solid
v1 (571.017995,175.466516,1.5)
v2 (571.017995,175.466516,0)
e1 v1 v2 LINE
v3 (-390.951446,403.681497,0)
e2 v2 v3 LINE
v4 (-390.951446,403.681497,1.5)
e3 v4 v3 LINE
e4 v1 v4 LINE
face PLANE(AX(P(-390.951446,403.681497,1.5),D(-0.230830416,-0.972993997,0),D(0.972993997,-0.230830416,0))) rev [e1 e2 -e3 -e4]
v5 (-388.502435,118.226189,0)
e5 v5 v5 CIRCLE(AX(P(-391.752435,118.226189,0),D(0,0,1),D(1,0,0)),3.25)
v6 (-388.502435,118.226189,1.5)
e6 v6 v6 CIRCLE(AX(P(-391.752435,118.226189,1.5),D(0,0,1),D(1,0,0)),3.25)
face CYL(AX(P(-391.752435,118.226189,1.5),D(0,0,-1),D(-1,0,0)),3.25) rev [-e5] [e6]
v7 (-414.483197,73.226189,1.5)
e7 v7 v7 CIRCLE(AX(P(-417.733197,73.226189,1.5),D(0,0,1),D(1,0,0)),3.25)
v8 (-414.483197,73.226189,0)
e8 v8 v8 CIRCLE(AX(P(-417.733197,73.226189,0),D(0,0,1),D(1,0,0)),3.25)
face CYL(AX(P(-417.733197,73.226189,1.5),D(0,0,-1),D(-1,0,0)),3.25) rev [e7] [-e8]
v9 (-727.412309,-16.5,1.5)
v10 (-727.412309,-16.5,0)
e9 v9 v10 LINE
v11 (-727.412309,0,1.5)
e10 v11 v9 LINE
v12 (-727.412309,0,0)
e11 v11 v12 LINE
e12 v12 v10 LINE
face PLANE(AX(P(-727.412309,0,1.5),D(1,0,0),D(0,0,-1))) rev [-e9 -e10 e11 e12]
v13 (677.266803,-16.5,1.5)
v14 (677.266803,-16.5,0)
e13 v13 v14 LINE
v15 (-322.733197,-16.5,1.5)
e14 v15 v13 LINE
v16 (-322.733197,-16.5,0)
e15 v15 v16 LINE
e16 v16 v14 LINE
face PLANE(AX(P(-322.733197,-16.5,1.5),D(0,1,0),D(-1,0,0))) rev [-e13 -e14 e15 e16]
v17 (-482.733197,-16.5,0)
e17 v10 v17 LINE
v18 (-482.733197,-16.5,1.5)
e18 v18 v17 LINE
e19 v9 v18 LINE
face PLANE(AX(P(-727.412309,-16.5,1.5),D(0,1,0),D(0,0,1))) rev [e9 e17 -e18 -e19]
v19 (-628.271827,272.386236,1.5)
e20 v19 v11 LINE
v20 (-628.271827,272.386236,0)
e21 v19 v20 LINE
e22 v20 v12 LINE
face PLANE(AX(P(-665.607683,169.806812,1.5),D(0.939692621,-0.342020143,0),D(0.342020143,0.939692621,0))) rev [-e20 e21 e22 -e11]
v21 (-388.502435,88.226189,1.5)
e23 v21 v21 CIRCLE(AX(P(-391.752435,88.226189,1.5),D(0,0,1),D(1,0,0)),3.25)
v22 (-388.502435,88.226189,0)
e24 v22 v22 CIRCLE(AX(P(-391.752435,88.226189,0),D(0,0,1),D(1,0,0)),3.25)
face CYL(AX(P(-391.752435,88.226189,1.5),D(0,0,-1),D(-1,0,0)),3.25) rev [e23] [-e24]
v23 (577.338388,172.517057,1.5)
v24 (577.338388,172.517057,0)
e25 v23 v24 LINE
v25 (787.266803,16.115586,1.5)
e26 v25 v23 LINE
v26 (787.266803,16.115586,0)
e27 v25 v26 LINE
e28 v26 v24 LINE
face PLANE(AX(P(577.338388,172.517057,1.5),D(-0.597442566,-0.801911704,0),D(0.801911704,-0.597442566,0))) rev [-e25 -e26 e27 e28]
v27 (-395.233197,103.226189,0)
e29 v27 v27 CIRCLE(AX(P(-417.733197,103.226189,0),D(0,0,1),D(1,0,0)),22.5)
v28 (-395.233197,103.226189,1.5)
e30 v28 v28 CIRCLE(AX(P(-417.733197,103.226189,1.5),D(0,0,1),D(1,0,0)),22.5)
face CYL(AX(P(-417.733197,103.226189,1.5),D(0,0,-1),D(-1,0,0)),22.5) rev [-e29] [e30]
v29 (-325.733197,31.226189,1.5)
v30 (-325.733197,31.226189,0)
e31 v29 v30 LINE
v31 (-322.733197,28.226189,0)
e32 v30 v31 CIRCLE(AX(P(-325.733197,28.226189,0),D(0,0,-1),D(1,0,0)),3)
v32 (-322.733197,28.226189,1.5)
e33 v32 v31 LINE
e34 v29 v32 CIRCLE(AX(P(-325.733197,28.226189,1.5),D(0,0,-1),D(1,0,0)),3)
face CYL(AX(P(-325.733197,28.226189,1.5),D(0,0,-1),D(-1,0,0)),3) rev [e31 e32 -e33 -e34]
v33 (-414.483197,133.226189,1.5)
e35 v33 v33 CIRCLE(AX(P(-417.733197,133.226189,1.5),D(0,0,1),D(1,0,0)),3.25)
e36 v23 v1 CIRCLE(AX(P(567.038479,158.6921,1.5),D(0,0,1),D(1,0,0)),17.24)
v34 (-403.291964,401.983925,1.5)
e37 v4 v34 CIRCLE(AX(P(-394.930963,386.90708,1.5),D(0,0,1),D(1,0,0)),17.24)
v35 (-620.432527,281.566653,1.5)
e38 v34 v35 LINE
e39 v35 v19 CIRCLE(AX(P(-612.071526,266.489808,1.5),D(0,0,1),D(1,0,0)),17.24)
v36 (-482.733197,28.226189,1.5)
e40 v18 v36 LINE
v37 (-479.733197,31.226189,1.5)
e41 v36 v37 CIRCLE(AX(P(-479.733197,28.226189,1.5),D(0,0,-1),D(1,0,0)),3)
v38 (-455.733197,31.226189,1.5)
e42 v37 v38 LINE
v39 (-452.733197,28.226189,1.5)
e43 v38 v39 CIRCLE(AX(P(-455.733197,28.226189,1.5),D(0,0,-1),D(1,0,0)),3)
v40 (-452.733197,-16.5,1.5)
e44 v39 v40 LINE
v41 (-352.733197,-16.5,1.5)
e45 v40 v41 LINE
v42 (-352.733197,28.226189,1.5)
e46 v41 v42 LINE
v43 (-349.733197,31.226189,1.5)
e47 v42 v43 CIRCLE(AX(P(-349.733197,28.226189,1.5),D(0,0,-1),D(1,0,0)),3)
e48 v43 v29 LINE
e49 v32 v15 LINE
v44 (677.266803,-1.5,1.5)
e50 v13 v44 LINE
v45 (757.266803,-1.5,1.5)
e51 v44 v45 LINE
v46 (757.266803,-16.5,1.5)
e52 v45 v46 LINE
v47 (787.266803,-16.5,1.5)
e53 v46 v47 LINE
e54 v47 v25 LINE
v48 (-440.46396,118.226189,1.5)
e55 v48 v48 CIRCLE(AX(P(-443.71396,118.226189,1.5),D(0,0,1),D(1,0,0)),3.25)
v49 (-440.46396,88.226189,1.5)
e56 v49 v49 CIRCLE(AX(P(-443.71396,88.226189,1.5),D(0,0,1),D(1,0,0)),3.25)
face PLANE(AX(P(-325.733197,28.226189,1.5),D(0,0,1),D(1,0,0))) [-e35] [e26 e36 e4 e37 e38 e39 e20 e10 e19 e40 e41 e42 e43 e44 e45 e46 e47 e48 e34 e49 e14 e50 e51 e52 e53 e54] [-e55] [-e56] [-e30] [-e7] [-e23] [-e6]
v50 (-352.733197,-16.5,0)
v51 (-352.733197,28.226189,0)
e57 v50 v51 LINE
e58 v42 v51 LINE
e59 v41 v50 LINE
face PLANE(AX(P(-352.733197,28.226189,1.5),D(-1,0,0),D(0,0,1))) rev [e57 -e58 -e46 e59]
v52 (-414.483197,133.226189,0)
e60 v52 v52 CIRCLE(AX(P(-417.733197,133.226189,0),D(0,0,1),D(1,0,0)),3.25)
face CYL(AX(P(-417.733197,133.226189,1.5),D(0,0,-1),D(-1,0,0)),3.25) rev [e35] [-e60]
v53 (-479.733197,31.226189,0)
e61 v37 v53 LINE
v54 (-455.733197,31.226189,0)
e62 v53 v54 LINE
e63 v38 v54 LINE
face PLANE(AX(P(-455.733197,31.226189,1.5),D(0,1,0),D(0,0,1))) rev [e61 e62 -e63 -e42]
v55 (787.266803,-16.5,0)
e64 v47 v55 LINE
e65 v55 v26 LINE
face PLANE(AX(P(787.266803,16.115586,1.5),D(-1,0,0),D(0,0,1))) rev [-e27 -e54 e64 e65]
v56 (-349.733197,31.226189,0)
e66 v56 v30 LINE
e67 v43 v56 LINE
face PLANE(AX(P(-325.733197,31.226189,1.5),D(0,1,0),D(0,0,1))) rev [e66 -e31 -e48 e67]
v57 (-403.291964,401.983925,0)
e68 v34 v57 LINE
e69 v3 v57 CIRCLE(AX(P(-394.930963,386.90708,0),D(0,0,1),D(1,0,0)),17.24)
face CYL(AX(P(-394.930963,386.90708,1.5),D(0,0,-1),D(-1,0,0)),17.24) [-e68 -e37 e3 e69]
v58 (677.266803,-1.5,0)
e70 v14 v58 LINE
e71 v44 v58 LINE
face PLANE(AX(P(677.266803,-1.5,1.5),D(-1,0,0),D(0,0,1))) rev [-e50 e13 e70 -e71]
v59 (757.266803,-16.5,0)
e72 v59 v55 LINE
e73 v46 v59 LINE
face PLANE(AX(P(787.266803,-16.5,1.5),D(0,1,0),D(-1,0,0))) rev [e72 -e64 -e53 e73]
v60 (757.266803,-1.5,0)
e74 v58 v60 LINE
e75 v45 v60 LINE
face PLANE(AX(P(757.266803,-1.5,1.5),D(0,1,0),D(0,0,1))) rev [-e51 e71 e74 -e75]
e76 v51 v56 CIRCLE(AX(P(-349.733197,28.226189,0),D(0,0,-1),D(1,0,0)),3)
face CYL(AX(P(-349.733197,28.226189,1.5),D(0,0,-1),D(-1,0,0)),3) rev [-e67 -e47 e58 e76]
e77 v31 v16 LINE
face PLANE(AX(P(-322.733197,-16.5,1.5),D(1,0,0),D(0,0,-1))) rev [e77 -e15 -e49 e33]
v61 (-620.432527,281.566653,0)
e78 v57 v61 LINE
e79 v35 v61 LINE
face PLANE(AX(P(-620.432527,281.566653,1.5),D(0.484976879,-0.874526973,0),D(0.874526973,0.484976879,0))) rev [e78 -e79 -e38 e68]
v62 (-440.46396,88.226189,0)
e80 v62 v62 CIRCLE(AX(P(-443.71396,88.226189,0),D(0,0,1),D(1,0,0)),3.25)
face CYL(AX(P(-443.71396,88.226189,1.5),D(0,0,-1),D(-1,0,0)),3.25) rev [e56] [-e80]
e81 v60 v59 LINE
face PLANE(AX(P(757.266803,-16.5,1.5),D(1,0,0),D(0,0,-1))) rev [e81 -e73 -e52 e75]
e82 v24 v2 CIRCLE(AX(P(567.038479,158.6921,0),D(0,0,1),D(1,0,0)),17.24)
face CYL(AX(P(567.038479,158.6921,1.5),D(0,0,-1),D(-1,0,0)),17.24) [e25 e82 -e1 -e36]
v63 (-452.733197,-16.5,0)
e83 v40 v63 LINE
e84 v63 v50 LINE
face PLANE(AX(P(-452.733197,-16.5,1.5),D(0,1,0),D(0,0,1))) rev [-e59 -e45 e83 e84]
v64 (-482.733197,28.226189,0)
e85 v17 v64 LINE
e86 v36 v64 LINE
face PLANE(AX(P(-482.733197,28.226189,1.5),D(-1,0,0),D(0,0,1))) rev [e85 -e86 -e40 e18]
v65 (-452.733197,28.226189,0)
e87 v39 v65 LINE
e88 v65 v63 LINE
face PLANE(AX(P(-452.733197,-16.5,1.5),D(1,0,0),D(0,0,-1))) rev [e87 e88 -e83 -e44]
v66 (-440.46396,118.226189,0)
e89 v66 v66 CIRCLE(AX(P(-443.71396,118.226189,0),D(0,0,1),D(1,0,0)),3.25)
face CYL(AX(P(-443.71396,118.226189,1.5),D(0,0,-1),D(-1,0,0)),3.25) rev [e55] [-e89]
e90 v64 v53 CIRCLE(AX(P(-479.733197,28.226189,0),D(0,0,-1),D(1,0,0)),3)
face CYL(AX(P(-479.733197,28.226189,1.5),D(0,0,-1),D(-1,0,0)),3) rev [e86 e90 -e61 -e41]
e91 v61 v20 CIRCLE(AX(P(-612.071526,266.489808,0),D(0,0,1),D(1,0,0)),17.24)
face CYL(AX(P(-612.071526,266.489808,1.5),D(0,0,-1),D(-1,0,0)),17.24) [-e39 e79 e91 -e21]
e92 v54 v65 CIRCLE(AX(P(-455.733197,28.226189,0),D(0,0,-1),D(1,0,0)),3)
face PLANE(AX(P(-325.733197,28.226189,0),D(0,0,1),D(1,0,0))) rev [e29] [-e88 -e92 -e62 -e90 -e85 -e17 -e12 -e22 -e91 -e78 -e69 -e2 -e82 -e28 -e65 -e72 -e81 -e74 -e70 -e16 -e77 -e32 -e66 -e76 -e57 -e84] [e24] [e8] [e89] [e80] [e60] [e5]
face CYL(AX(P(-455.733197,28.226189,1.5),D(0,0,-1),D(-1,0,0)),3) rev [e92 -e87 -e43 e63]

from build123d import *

# Parameters (mm, degrees)
SKETCH_1_R             = 3.25
SKETCH_1_R_2           = 22.5
SM_BASE_FLANGE_1_DEPTH = 1.5


# Sheet-metal steps are written as plain solids
with BuildPart() as part:
    # Sketch 1 → Базовая кромка1 (new body)
    with BuildSketch(Plane.XY):
        with BuildLine():
            Line((677.266802552, -1.5), (677.266802552, -16.5))
            Line((677.266802552, -16.5), (-322.733197448, -16.5))
            Line((-322.733197448, -16.5), (-322.733197448, 4.22618932))
            Line((-322.733197448, 4.22618932), (-322.733197448, 28.22618932))
            ThreePointArc((-322.733197448, 28.22618932), (-323.611877105, 30.347509663), (-325.733197448, 31.22618932))
            Line((-325.733197448, 31.22618932), (-349.733197448, 31.22618932))
            ThreePointArc((-349.733197448, 31.22618932), (-351.854517792, 30.347509663), (-352.733197448, 28.22618932))
            Line((-352.733197448, 28.22618932), (-352.733197448, 4.22618932))
            Line((-352.733197448, 4.22618932), (-352.733197448, -16.5))
            Line((-352.733197448, -16.5), (-452.733197448, -16.5))
            Line((-452.733197448, -16.5), (-452.733197448, 4.22618932))
            Line((-452.733197448, 4.22618932), (-452.733197448, 28.22618932))
            ThreePointArc((-452.733197448, 28.22618932), (-453.611877105, 30.347509663), (-455.733197448, 31.22618932))
            Line((-455.733197448, 31.22618932), (-479.733197448, 31.22618932))
            ThreePointArc((-479.733197448, 31.22618932), (-481.854517792, 30.347509663), (-482.733197448, 28.22618932))
            Line((-482.733197448, 28.22618932), (-482.733197448, 4.22618932))
            Line((-482.733197448, 4.22618932), (-482.733197448, -16.5))
            Line((-482.733197448, -16.5), (-727.412308586, -16.5))
            Line((-727.412308586, -16.5), (-727.412308586, 0))
            Line((-727.412308586, 0), (-665.607683437, 169.806812014))
            Line((-665.607683437, 169.806812014), (-628.27182662, 272.386235556))
            ThreePointArc((-628.27182662, 272.386235556), (-625.181995264, 277.685039029), (-620.432527225, 281.566653306))
            Line((-620.432527225, 281.566653306), (-403.291964068, 401.983925448))
            ThreePointArc((-403.291964068, 401.983925448), (-397.280386008, 403.986243464), (-390.951446304, 403.681496942))
            Line((-390.951446304, 403.681496942), (571.017994956, 175.466516041))
            ThreePointArc((571.017994956, 175.466516041), (574.328905861, 174.314751992), (577.338388414, 172.517057299))
            Line((577.338388414, 172.517057299), (643.325554365, 123.355108982))
            Line((643.325554365, 123.355108982), (787.266802552, 16.115585934))
            Line((787.266802552, 16.115585934), (787.266802552, -16.5))
            Line((787.266802552, -16.5), (757.266802552, -16.5))
            Line((757.266802552, -16.5), (757.266802552, -1.5))
            Line((757.266802552, -1.5), (677.266802552, -1.5))
        make_face()
        with Locations((-417.733197448, 133.22618932)):
            Circle(SKETCH_1_R, mode=Mode.SUBTRACT)
        with Locations((-417.733197448, 103.22618932)):
            Circle(SKETCH_1_R_2, mode=Mode.SUBTRACT)
        with Locations((-391.752435335, 118.22618932)):
            Circle(SKETCH_1_R, mode=Mode.SUBTRACT)
        with Locations((-391.752435335, 88.22618932)):
            Circle(SKETCH_1_R, mode=Mode.SUBTRACT)
        with Locations((-417.733197448, 73.22618932)):
            Circle(SKETCH_1_R, mode=Mode.SUBTRACT)
        with Locations((-443.713959562, 88.22618932)):
            Circle(SKETCH_1_R, mode=Mode.SUBTRACT)
        with Locations((-443.713959562, 118.22618932)):
            Circle(SKETCH_1_R, mode=Mode.SUBTRACT)
    extrude(amount=SM_BASE_FLANGE_1_DEPTH)


solid = part.part
